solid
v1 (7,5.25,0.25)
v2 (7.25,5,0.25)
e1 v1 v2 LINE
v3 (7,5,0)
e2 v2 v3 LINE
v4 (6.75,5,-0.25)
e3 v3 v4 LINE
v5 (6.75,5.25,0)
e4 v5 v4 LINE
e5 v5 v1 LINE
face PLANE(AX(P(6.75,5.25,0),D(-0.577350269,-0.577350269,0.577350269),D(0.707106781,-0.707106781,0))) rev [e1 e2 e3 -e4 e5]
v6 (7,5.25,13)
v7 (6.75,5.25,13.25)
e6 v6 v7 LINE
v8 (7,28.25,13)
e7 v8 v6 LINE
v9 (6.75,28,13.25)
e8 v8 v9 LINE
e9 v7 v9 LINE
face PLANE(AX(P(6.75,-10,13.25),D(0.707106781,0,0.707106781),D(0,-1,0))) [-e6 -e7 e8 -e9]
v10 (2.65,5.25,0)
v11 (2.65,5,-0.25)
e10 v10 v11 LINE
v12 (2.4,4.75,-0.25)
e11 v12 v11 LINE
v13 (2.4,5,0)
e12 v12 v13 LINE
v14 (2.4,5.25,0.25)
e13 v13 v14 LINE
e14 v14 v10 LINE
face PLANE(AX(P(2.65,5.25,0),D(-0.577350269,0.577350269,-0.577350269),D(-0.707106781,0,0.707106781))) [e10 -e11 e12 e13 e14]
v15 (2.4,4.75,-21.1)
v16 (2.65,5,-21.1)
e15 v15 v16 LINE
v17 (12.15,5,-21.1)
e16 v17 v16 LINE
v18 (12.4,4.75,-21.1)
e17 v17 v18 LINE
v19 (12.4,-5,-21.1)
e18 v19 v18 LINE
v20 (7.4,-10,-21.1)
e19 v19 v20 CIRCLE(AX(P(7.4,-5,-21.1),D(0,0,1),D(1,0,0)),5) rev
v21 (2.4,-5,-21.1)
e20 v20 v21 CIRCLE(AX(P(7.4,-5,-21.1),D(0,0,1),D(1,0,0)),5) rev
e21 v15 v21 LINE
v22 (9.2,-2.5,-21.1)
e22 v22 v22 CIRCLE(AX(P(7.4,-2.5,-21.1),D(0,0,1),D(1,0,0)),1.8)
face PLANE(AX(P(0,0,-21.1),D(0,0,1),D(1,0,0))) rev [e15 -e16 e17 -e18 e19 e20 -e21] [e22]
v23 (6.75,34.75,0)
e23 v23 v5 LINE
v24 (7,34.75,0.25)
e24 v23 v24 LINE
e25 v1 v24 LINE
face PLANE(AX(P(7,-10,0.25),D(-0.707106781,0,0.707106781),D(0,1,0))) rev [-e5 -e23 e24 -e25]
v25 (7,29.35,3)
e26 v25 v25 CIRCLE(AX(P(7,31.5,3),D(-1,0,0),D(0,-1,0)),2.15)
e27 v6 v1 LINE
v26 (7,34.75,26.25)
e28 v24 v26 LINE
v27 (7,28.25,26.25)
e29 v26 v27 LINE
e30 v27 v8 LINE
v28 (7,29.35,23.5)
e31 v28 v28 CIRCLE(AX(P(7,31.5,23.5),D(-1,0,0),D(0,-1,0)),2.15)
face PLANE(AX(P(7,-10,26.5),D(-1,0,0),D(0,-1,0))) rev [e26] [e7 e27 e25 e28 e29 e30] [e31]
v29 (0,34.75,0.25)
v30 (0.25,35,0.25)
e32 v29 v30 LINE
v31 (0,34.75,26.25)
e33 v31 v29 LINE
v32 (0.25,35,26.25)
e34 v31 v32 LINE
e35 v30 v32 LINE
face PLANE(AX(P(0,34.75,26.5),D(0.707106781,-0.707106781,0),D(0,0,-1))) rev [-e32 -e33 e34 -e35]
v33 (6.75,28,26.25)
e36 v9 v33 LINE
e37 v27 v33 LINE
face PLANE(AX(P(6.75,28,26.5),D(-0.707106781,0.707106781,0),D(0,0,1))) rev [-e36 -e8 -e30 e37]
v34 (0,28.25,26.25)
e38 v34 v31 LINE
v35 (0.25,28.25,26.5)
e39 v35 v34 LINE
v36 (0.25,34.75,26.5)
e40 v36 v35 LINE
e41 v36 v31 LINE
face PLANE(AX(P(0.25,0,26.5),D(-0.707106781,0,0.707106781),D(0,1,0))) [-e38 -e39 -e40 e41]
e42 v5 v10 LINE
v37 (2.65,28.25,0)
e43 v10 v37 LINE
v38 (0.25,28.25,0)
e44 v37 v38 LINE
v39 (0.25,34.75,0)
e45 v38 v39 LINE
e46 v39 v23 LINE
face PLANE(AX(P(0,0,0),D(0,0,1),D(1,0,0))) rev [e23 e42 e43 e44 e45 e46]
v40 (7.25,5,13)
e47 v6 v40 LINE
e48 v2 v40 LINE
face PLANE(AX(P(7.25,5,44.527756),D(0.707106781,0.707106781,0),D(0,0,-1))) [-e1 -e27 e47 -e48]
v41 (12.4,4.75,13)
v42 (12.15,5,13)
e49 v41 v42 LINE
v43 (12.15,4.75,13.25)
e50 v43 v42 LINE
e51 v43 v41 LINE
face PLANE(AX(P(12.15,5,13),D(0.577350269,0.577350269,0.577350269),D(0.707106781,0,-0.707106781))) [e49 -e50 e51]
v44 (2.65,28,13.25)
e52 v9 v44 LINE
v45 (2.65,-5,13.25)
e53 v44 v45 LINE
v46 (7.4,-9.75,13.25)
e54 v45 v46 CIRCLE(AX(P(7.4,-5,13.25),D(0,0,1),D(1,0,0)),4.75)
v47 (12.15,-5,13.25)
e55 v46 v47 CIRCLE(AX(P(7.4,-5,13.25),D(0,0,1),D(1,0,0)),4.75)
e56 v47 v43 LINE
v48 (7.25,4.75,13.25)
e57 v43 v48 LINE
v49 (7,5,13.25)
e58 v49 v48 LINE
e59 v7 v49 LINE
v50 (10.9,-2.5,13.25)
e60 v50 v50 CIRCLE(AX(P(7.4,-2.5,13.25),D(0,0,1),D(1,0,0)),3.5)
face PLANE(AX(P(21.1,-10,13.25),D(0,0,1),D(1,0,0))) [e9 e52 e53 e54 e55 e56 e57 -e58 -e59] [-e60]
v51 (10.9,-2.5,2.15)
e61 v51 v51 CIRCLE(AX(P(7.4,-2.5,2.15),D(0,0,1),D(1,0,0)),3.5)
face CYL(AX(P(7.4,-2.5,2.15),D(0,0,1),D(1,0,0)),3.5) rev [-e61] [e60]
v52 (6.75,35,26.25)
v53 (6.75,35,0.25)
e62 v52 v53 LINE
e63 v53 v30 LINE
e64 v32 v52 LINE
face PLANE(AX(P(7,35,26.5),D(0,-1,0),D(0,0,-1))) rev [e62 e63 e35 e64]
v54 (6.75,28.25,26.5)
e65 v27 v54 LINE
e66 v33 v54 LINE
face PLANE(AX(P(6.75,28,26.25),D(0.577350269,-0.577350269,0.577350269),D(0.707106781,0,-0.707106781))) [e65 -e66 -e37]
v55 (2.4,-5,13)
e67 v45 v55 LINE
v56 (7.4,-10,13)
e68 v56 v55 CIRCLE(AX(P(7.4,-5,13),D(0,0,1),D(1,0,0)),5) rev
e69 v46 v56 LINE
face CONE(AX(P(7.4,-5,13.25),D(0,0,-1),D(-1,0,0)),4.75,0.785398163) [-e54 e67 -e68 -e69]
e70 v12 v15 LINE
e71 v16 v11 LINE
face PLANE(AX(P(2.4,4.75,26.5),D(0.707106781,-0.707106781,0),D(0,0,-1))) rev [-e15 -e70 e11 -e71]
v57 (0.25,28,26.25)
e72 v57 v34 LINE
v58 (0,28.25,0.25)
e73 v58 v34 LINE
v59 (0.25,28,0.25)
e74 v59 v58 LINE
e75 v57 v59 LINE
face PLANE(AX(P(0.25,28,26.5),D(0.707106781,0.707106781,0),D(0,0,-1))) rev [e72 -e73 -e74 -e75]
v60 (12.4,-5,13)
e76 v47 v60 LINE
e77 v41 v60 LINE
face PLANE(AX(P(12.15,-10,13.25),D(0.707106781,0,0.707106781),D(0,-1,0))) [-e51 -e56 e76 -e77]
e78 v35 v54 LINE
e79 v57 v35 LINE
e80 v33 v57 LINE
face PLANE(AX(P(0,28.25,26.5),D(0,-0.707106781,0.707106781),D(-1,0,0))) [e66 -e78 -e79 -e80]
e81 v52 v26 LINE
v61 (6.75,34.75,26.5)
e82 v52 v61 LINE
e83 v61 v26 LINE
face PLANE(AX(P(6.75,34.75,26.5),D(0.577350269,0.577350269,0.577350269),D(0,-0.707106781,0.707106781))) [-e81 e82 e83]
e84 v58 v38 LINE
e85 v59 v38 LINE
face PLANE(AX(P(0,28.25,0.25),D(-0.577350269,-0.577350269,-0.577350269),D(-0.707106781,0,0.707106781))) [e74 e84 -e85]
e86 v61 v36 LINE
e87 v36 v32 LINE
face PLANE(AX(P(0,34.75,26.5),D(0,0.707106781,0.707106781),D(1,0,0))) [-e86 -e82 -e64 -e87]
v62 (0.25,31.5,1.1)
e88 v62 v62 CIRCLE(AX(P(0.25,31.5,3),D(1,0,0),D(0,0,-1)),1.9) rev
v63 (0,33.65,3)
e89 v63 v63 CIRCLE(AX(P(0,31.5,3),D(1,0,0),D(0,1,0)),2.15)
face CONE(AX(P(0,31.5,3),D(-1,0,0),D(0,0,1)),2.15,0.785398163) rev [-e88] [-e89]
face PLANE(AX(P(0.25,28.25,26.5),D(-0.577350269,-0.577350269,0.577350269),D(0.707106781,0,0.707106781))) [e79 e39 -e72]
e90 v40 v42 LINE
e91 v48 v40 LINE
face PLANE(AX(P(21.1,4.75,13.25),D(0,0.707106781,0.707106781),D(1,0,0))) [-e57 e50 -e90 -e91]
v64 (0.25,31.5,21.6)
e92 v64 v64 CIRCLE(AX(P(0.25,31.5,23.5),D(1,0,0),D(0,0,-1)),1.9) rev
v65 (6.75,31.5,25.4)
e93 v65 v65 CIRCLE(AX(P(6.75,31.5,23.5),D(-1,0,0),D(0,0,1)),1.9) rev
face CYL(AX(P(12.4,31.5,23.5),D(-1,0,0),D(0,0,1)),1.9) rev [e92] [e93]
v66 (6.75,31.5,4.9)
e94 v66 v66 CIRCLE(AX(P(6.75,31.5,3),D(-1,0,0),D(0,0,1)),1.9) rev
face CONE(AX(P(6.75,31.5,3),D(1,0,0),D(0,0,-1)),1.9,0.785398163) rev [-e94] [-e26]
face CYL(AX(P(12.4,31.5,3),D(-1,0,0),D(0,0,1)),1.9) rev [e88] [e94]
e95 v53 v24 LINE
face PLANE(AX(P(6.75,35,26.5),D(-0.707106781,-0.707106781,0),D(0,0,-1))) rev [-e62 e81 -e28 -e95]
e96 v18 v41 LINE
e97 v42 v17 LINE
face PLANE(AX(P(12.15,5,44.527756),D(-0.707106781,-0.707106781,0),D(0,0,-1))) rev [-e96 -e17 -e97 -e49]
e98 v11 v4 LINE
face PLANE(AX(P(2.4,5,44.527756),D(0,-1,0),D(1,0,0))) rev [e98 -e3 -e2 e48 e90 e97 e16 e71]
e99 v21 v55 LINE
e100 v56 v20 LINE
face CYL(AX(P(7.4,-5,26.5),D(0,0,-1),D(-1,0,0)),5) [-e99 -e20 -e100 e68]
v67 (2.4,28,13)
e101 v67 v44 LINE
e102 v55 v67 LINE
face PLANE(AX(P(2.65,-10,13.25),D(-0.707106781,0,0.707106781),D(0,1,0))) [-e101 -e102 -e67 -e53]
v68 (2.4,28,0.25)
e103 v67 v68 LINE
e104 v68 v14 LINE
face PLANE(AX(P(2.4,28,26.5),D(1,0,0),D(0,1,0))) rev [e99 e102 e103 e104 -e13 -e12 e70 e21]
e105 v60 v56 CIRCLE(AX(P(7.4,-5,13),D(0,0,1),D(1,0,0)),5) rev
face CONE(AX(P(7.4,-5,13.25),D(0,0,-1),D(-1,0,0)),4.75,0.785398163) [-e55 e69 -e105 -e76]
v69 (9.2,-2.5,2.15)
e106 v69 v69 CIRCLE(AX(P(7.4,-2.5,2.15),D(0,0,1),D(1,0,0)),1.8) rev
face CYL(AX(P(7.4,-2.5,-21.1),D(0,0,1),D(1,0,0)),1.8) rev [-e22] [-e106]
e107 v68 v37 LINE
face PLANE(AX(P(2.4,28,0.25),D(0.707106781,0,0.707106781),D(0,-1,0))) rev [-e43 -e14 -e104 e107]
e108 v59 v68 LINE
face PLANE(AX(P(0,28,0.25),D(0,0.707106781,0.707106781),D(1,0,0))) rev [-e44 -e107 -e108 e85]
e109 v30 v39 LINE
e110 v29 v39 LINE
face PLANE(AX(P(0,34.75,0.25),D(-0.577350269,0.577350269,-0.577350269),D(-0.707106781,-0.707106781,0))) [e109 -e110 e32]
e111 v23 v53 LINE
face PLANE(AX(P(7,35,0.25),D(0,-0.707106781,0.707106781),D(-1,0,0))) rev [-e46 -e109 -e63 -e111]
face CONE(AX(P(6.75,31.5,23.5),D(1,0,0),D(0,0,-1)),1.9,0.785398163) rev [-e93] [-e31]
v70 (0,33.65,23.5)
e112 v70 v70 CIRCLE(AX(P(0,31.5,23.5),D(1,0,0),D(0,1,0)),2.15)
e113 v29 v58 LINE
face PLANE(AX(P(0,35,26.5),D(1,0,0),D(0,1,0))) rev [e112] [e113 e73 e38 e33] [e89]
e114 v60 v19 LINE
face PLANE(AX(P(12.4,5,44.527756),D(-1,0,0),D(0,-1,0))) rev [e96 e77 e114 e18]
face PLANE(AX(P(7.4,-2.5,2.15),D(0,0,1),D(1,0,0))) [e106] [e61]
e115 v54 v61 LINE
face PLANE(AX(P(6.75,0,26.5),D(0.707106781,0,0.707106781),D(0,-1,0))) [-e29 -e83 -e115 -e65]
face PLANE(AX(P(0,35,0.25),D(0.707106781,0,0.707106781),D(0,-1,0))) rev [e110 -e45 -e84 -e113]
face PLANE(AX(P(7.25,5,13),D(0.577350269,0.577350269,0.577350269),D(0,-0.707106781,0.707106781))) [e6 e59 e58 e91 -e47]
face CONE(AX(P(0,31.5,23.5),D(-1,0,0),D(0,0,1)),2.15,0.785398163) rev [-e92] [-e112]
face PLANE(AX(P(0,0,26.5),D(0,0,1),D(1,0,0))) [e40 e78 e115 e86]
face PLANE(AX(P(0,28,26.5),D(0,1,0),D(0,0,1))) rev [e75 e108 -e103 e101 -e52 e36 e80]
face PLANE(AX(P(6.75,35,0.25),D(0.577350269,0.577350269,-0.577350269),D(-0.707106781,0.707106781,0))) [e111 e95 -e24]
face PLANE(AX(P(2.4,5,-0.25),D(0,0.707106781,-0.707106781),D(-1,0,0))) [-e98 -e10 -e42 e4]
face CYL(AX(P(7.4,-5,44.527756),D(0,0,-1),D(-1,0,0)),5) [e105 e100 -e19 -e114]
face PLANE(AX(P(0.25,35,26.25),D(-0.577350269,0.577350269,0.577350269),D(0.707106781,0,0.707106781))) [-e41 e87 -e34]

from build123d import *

# Parameters (mm, degrees)
BOSS_EXTRUDE1_DEPTH             = 26.5
SKETCH2_W                       = 10
SKETCH2_H                       = 15
BOSS_EXTRUDE2_DEPTH             = 21.1
BOSS_EXTRUDE2_DIRECTION_2_REACH = 46.455
SKETCH3_W                       = 13.25
SKETCH3_H                       = 38
CUT_EXTRUDE1_DEPTH              = 21.1
CUT_EXTRUDE2_DEPTH              = 46.618088518
CUT_EXTRUDE2_DEPTH_BACK         = 46.618088518
SKETCH4_R                       = 1.8
SKETCH5_R                       = 3.5
CUT_EXTRUDE3_DEPTH              = 11.1
SKETCH6_R                       = 1.9
CUT_EXTRUDE4_DEPTH              = 46.618088518
FILLET1_R                       = 5
CHAMFER1_SIZE                   = 0.25


with BuildPart() as part:
    # Sketch1 → Boss-Extrude1 (new body)
    with BuildSketch(Plane.XY):
        Polygon((0, 35), (0, 28), (2.4, 28), (2.4, -10), (7, -10), (7, 35), align=None)
    extrude(amount=BOSS_EXTRUDE1_DEPTH)

    # Sketch2 → Boss-Extrude2 (add)
    with BuildSketch(Plane.XY):
        with Locations((7.4, -2.5)):
            Rectangle(SKETCH2_W, SKETCH2_H)
    extrude(amount=-BOSS_EXTRUDE2_DEPTH)

    # Boss-Extrude2 direction 2: up to this face of the body (flat: up to its plane)
    boss_extrude2_direction_2_end = Plane(part.part.faces().sort_by_distance((4.437265416, 13.926273458, 26.5))[0])
    # Sketch2 → Boss-Extrude2 direction 2 (add, up to the picked face)
    with BuildSketch(Plane.XY, mode=Mode.PRIVATE) as boss_extrude2_direction_2_sk1:
        with Locations((7.4, -2.5)):
            Rectangle(SKETCH2_W, SKETCH2_H)
    boss_extrude2_direction_2_tool1 = split(extrude(boss_extrude2_direction_2_sk1.sketch, amount=BOSS_EXTRUDE2_DIRECTION_2_REACH, mode=Mode.PRIVATE), bisect_by=boss_extrude2_direction_2_end, keep=Keep.BOTH, mode=Mode.PRIVATE)
    add(boss_extrude2_direction_2_tool1.solids().sort_by(Axis((7.4, -2.5, 0), (0, 0, 1)))[0])

    # Sketch3 → Cut-Extrude1 (cut)
    with BuildSketch(Plane(origin=(0, 0, 0), x_dir=(0, 0, -1), z_dir=(1, 0, 0))):
        with Locations((-19.875, 9)):
            Rectangle(SKETCH3_W, SKETCH3_H)
    extrude(amount=CUT_EXTRUDE1_DEPTH, mode=Mode.SUBTRACT)

    # Sketch4 → Cut-Extrude2 (cut, two sides: drawn at the far end of the back side and taken through both)
    with BuildSketch(Plane.XY.offset(-CUT_EXTRUDE2_DEPTH_BACK)):
        with Locations((7.4, -2.5)):
            Circle(SKETCH4_R)
    extrude(amount=CUT_EXTRUDE2_DEPTH + CUT_EXTRUDE2_DEPTH_BACK, mode=Mode.SUBTRACT)

    # Sketch5 → Cut-Extrude3 (cut)
    with BuildSketch(Plane.XY.offset(13.25)):
        with Locations((7.4, -2.5)):
            Circle(SKETCH5_R)
    extrude(amount=-CUT_EXTRUDE3_DEPTH, mode=Mode.SUBTRACT)

    # Sketch6 → Cut-Extrude4 (cut, through all)
    with BuildSketch(Plane(origin=(0, 0, 0), x_dir=(0, 0, -1), z_dir=(1, 0, 0))):
        with Locations(Location((-3, 31.5, 0), (0, 0, 270))):
            Circle(SKETCH6_R)
        with Locations(Location((-23.5, 31.5, 0), (0, 0, 180))):
            Circle(SKETCH6_R)
    extrude(amount=CUT_EXTRUDE4_DEPTH, mode=Mode.SUBTRACT)

    # Fillet1
    fillet1_edges = [part.edges().sort_by_distance(p)[0] for p in [
        (2.4, -10, -3.925),
        (12.4, -10, -3.925),
    ]]
    fillet(fillet1_edges, radius=FILLET1_R - 0.0001)  # a hair under: the kernel refuses the full size

    # Chamfer1
    chamfer1_edges = [part.edges().sort_by_distance(p)[0] for p in [
        (3.864436805, -8.535563195, 13.25),
        (10.935563195, -8.535563195, 13.25),
        (7, 35, 13.25),
        (0, 28, 13.25),
        (0, 35, 13.25),
        (3.5, 28, 26.5),
        (7, 20, 0),
        (4.7, 5, 0),
        (2.4, 5, -10.55),
        (7, 5, 6.625),
        (12.4, 5, -3.925),
        (7, 31.5, 26.5),
        (7, 28, 19.875),
        (2.4, 11.49995, 13.25),
        (9.7, 5, 13.25),
        (7, 16.5, 13.25),
        (3.5, 35, 26.5),
        (2.4, 16.5, 0),
        (1.2, 28, 0),
        (0, 33.4, 3),
        (7, 33.4, 3),
        (0, 31.5, 21.6),
        (7, 31.5, 21.6),
        (0, 31.5, 0),
        (3.5, 35, 0),
        (0, 31.5, 26.5),
        (12.4, -5e-05, 13.25),
    ]]
    chamfer(chamfer1_edges, length=CHAMFER1_SIZE)


solid = part.part
